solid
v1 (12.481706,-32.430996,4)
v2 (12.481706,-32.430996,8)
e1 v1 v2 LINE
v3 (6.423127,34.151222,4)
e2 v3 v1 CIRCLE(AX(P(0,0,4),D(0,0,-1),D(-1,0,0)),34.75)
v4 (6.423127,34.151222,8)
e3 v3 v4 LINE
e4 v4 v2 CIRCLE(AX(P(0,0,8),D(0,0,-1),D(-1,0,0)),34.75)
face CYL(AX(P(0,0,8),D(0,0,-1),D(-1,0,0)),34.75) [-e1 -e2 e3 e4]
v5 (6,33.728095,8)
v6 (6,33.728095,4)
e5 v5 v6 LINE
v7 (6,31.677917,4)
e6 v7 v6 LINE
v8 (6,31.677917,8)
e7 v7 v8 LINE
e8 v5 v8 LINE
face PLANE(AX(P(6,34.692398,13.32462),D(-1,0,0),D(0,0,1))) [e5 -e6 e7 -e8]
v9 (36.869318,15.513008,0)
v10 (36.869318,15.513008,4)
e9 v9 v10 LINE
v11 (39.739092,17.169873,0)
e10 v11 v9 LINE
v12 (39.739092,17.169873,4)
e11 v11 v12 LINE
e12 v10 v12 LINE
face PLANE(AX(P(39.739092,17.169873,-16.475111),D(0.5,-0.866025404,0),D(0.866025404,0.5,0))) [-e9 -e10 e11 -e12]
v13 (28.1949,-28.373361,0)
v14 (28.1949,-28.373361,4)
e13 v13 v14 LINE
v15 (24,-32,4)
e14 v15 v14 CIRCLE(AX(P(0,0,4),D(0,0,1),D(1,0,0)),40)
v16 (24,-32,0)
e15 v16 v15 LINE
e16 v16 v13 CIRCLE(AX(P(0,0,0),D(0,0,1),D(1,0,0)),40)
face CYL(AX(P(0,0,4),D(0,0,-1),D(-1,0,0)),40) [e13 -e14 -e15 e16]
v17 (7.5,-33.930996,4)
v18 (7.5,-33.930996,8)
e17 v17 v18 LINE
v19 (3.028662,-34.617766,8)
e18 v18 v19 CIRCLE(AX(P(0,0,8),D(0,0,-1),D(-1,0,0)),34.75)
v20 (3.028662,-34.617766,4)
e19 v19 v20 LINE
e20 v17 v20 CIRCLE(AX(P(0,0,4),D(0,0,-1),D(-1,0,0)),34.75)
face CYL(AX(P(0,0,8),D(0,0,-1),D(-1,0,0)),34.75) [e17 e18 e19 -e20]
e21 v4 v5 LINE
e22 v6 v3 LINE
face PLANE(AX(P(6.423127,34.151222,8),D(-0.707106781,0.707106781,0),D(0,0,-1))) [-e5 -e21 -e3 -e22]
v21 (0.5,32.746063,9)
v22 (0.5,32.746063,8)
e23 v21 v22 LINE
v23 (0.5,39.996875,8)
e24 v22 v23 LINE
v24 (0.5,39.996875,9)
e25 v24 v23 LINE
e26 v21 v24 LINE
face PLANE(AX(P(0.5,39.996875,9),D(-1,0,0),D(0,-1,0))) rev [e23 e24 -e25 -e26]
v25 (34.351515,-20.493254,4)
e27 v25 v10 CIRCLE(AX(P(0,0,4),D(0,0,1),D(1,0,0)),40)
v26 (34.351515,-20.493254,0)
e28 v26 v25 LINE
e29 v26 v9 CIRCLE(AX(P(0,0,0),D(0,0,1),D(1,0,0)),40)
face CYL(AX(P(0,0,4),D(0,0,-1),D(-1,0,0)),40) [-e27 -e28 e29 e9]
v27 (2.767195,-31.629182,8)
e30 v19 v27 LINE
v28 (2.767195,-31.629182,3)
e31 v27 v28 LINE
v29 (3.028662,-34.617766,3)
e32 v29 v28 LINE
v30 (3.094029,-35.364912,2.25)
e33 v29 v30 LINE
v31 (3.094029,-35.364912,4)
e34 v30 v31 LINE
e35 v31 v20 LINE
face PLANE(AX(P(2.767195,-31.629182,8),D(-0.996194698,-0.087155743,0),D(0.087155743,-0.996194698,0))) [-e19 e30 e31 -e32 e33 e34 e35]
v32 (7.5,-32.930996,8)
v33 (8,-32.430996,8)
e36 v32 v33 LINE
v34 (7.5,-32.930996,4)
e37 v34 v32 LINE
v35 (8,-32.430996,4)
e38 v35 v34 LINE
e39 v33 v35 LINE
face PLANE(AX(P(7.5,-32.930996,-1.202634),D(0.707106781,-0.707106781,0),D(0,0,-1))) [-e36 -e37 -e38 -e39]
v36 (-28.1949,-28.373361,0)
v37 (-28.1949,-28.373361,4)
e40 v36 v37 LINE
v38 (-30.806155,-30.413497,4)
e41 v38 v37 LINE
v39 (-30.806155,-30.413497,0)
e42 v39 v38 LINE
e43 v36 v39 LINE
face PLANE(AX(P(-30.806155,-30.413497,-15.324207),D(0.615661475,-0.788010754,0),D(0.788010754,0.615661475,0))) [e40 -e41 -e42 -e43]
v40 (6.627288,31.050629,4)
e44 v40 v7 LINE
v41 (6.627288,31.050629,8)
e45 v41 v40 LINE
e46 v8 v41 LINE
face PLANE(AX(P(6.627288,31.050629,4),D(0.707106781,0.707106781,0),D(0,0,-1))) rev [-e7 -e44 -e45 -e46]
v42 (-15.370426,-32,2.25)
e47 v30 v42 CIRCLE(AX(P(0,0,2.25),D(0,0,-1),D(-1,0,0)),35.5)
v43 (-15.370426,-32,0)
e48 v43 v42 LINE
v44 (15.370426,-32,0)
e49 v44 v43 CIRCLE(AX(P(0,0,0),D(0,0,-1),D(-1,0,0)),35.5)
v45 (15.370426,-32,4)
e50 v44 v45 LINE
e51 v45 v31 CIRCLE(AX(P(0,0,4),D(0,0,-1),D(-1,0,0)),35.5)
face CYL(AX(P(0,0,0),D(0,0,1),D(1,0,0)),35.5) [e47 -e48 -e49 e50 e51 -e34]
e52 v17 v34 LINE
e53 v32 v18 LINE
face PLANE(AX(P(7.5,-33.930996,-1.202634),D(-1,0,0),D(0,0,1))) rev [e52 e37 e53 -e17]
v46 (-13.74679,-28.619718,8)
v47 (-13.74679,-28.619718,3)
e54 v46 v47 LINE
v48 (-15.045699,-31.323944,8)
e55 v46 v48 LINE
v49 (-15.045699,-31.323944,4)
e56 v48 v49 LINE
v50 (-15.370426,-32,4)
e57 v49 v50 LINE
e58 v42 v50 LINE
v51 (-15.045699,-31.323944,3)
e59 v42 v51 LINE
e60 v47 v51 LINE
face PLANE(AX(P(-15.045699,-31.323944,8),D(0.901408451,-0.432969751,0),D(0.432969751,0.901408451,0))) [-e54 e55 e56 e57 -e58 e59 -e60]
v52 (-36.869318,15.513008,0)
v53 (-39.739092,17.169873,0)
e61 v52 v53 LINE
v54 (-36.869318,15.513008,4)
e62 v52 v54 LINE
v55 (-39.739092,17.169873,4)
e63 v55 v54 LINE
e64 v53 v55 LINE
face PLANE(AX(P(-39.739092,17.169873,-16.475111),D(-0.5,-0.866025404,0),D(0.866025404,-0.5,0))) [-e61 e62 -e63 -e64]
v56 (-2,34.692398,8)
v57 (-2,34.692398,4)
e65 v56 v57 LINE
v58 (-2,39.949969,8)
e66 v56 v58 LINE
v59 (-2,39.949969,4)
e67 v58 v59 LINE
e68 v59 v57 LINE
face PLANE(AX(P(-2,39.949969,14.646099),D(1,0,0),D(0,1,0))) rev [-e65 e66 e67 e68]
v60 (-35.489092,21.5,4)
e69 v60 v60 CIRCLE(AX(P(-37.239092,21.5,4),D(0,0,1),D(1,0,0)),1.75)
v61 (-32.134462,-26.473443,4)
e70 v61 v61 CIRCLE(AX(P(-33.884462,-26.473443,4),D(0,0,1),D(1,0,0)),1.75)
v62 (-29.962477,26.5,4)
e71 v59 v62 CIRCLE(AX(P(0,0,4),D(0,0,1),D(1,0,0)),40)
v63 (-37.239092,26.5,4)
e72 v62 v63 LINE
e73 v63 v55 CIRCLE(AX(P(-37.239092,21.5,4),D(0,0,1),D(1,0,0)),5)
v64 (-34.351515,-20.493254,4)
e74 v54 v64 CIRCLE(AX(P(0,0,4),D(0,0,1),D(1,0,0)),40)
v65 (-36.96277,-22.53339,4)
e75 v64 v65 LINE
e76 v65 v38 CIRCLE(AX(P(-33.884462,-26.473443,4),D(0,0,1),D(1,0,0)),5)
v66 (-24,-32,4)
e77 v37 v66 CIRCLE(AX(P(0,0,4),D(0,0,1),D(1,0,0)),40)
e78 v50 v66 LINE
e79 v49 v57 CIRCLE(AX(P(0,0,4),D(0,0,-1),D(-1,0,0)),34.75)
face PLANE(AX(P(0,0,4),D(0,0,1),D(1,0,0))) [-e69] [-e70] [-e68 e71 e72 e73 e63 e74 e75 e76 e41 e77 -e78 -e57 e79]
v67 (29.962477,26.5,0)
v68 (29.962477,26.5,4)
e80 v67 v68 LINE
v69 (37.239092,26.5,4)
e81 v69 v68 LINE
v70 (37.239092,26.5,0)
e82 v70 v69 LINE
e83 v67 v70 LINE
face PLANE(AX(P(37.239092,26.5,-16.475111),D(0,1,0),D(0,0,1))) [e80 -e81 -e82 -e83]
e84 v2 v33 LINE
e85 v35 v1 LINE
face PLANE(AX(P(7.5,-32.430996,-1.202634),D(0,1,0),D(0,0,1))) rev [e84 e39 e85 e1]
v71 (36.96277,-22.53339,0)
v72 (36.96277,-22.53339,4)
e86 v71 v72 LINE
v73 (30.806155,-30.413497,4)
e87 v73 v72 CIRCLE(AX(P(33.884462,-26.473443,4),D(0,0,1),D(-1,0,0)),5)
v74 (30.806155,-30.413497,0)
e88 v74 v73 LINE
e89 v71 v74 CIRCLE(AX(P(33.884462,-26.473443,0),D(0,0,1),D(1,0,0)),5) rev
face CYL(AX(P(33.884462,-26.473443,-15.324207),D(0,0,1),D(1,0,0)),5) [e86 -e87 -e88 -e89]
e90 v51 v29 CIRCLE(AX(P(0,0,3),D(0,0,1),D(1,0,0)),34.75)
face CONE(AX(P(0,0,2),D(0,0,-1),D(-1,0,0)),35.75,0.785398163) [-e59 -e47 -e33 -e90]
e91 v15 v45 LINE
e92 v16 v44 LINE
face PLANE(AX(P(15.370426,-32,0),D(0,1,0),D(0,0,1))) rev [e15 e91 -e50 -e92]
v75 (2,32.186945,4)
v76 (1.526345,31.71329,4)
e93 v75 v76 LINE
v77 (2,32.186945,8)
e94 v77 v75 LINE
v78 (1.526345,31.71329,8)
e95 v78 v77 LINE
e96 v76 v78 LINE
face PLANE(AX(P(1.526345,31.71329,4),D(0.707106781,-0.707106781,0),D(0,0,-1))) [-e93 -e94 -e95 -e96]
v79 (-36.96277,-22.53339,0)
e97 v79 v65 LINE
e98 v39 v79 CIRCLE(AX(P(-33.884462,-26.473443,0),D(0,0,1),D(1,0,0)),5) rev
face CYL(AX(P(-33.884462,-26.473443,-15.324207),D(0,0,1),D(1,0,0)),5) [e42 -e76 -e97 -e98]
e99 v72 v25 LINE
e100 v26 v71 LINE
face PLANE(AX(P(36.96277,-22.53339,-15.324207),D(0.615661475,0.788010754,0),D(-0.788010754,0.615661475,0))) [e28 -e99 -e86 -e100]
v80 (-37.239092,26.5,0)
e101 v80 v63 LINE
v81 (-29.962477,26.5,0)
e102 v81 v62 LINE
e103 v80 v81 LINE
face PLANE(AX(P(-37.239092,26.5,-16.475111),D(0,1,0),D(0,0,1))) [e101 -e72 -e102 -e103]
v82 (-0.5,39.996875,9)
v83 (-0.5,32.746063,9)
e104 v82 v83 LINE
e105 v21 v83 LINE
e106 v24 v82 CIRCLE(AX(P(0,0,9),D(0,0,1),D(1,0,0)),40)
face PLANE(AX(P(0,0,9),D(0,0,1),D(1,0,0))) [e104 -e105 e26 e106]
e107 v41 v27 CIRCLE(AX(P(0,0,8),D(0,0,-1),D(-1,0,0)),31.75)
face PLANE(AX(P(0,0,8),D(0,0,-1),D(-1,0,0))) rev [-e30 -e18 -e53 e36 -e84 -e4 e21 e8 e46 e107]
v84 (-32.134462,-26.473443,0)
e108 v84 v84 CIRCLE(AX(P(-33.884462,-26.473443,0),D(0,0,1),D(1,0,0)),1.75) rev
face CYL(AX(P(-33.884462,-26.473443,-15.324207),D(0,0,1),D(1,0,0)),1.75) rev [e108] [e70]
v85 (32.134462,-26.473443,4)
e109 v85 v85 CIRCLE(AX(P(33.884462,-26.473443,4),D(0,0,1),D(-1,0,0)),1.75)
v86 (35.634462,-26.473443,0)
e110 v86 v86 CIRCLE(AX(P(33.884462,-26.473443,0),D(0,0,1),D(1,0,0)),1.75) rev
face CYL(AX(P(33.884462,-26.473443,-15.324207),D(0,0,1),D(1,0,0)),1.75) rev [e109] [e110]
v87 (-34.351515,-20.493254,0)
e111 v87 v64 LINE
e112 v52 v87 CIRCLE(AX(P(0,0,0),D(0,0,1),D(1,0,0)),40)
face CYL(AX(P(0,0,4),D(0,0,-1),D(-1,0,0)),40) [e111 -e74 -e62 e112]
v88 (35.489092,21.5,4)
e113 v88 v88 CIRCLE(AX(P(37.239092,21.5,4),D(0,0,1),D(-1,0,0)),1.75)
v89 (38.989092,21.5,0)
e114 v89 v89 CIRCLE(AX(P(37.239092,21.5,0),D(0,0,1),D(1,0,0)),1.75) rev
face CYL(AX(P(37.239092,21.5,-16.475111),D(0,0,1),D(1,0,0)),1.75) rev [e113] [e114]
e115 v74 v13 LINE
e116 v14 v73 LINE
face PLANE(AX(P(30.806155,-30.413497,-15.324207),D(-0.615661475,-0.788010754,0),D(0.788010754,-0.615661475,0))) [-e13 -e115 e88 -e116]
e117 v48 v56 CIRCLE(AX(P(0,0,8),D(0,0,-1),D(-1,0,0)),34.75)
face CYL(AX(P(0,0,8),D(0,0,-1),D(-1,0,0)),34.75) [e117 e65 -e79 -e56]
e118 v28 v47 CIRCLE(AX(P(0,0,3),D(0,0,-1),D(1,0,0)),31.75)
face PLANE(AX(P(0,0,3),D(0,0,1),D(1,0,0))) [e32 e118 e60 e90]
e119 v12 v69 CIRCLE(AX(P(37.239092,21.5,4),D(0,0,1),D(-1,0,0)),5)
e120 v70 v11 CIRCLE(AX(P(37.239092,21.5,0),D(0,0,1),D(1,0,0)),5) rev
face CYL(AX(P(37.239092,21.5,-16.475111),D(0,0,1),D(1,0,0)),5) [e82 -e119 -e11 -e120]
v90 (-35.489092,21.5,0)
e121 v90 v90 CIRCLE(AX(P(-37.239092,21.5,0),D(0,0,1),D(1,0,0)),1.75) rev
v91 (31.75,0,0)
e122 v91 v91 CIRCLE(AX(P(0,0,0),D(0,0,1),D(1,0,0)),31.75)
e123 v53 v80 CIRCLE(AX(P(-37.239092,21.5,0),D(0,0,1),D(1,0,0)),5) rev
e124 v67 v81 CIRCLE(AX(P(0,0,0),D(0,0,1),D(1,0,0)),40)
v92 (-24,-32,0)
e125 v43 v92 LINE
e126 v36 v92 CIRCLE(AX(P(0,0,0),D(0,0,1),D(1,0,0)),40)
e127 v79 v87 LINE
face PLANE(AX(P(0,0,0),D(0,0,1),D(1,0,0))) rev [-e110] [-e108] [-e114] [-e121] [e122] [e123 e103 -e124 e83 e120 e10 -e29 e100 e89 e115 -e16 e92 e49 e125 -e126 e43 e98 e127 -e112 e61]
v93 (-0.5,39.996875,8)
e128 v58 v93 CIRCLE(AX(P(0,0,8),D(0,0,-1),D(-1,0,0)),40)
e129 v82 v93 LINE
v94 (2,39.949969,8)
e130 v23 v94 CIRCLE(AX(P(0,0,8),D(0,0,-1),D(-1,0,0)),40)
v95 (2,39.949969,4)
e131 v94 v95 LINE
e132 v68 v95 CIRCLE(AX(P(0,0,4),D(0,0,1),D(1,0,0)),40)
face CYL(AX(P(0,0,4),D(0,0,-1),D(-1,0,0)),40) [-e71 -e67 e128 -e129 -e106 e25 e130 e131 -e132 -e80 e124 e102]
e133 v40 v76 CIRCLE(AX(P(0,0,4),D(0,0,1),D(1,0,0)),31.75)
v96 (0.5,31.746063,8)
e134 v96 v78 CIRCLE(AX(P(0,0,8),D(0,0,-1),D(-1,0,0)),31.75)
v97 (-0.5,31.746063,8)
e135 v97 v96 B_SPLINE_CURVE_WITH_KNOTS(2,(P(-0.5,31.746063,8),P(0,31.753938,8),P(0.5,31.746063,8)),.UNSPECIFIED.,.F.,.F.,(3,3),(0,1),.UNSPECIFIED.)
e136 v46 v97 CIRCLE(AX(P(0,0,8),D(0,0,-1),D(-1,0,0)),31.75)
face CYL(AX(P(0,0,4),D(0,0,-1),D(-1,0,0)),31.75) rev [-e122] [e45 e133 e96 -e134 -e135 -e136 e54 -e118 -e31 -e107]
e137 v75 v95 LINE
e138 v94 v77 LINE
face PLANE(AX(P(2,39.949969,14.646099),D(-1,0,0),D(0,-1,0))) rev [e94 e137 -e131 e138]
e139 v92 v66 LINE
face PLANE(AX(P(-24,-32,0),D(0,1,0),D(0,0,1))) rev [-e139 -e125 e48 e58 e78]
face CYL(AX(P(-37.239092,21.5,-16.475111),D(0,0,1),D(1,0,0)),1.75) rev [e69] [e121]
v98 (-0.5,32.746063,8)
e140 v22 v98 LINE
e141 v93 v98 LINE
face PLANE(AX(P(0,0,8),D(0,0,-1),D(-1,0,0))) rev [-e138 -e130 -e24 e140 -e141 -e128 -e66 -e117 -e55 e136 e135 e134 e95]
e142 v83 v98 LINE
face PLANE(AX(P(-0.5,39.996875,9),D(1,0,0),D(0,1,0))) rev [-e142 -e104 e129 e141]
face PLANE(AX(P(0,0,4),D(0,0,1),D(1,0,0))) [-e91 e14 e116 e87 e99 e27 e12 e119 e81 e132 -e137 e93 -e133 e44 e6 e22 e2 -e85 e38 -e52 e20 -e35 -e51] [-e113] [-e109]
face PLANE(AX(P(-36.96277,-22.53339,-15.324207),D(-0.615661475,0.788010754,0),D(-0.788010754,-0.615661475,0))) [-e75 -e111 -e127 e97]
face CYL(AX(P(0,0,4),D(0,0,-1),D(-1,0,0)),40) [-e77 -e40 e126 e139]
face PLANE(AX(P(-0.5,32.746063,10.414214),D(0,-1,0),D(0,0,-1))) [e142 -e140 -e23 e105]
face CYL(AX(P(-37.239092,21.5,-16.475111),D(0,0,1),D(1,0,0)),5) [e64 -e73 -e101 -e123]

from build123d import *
from build123d.topology import SkipClean

# Parameters (mm, degrees)
SKETCH_1_R          = 40
SKETCH_1_R_2        = 31.75
EXTRUDE_1_DEPTH     = 4
EXTRUDE_START       = -4
SKETCH_2_R          = 1.75
EXTRUDE_2_DEPTH     = 4
CUT_EXTRUDE_2_DEPTH = 57.709787515
SKETCH_4_R          = 1.75
EXTRUDE_3_DEPTH     = 4
SKETCH_5_R          = 34.75
SKETCH_5_R_2        = 31.75
EXTRUDE_4_DEPTH     = 4
CUT_EXTRUDE_3_DEPTH = 59.310727346
EXTRUDE_5_DEPTH     = 4
EXTRUDE_6_DEPTH     = 1
CUT_EXTRUDE_START   = -2
CUT_EXTRUDE_4_DEPTH = 2
CUT_EXTRUDE_START_2 = -1
CUT_EXTRUDE_5_DEPTH = 1
CHAMFER_1_SIZE      = 1
SKETCH_11_W         = 4.981706152
SKETCH_11_H         = 1.5
CUT_EXTRUDE_6_DEPTH = 4
CHAMFER_2_SIZE      = 0.5
SKETCH_12_W         = 4
SKETCH_12_H         = 3.514481439
CUT_EXTRUDE_7_DEPTH = 4
CHAMFER_3_SIZE      = 0.5
SKETCH_13_W         = 1
SKETCH_13_H         = 1
CUT_EXTRUDE_8_DEPTH = 1


with BuildPart() as part:
    # 草图1 → 凸台-拉伸1 (new body)
    with BuildSketch(Plane.XY):
        Circle(SKETCH_1_R)
        Circle(SKETCH_1_R_2, mode=Mode.SUBTRACT)
    extrude(amount=EXTRUDE_1_DEPTH)

    # 草图2 → 凸台-拉伸2 (add)
    # profile 1 of 2: a face of its own
    with BuildSketch(Plane.XY.offset(4).offset(EXTRUDE_START)):
        with BuildLine():
            Line((-36.962769782, -22.533389671), (-34.351514644, -20.493253565))
            ThreePointArc((-34.351514644, -20.493253565), (-31.520430144, -24.626459013), (-28.194899891, -28.373361101))
            Line((-28.194899891, -28.373361101), (-30.806155028, -30.413497207))
            ThreePointArc((-30.806155028, -30.413497207), (-37.824516173, -29.551750816), (-36.962769782, -22.533389671))
        make_face()
        with Locations((-33.884462405, -26.473443439)):
            Circle(SKETCH_2_R, mode=Mode.SUBTRACT)
    # profile 2 of 2: a face of its own
    with BuildSketch(Plane.XY.offset(4).offset(EXTRUDE_START)):
        with BuildLine():
            Line((30.806155028, -30.413497207), (28.194899891, -28.373361101))
            ThreePointArc((28.194899891, -28.373361101), (31.520430144, -24.626459013), (34.351514644, -20.493253565))
            Line((34.351514644, -20.493253565), (36.962769782, -22.533389671))
            ThreePointArc((36.962769782, -22.533389671), (37.824516173, -29.551750816), (30.806155028, -30.413497207))
        make_face()
        with Locations((33.884462405, -26.473443439)):
            Circle(SKETCH_2_R, mode=Mode.SUBTRACT)
    extrude(amount=EXTRUDE_2_DEPTH)

    # 草图3 → 切除-拉伸2 (cut, through all)
    with BuildSketch(Plane.XY.offset(4)):
        with BuildLine():
            Line((-24, -32), (-15.370426149, -32))
            ThreePointArc((-15.370426149, -32), (0, -35.5), (15.370426149, -32))
            Line((15.370426149, -32), (24, -32))
            ThreePointArc((24, -32), (0, -40), (-24, -32))
        make_face()
    extrude(amount=-CUT_EXTRUDE_2_DEPTH, mode=Mode.SUBTRACT)

    # 草图4 → 凸台-拉伸3 (add)
    # profile 1 of 2: a face of its own
    with BuildSketch(Plane.XY.offset(4).offset(EXTRUDE_START)):
        with BuildLine():
            Line((-37.239092363, 26.5), (-29.962476533, 26.5))
            ThreePointArc((-29.962476533, 26.5), (-33.86444566, 21.288478578), (-36.869317712, 15.513007814))
            Line((-36.869317712, 15.513007814), (-39.739092363, 17.169872981))
            ThreePointArc((-39.739092363, 17.169872981), (-42.068721494, 22.794095226), (-37.239092363, 26.5))
        make_face()
        with Locations((-37.239092363, 21.5)):
            Circle(SKETCH_4_R, mode=Mode.SUBTRACT)
    # profile 2 of 2: a face of its own
    with BuildSketch(Plane.XY.offset(4).offset(EXTRUDE_START)):
        with BuildLine():
            Line((39.739092363, 17.169872981), (36.869317712, 15.513007814))
            ThreePointArc((36.869317712, 15.513007814), (33.86444566, 21.288478578), (29.962476533, 26.5))
            Line((29.962476533, 26.5), (37.239092363, 26.5))
            ThreePointArc((37.239092363, 26.5), (42.068721494, 22.794095226), (39.739092363, 17.169872981))
        make_face()
        with Locations((37.239092363, 21.5)):
            Circle(SKETCH_4_R, mode=Mode.SUBTRACT)
    extrude(amount=EXTRUDE_3_DEPTH)

    # 草图5 → 凸台-拉伸4 (add)
    with BuildSketch(Plane(origin=(0, 0, 4), x_dir=(-1, 0, 0), z_dir=(0, 0, -1))):
        Circle(SKETCH_5_R)
        Circle(SKETCH_5_R_2, mode=Mode.SUBTRACT)
    extrude(amount=-EXTRUDE_4_DEPTH)

    # 草图6 → 切除-拉伸3 (cut, through all)
    with SkipClean():  # the faces are left unmerged after this step: merging them gives an invalid solid
        with BuildSketch(Plane.XY.offset(4)):
            with BuildLine():
                Line((-15.045698836, -31.323943662), (-13.746789584, -28.61971831))
                ThreePointArc((-13.746789584, -28.61971831), (-5.692283606, -31.235563183), (2.767194832, -31.629181664))
                Line((2.767194832, -31.629181664), (3.02866206, -34.617765759))
                ThreePointArc((3.02866206, -34.617765759), (-6.230137175, -34.18695498), (-15.045698836, -31.323943662))
            make_face()
        extrude(amount=CUT_EXTRUDE_3_DEPTH, mode=Mode.SUBTRACT)

    # 草图7 → 凸台-拉伸5 (add)
    with SkipClean():  # the faces are left unmerged after this step: merging them gives an invalid solid
        with BuildSketch(Plane.XY.offset(4)):
            with BuildLine():
                Line((-2, 39.949968711), (-2, 34.692398303))
                ThreePointArc((-2, 34.692398303), (0, 34.75), (2, 34.692398303))
                Line((2, 34.692398303), (2, 39.949968711))
                ThreePointArc((2, 39.949968711), (0, 40), (-2, 39.949968711))
            make_face()
        extrude(amount=EXTRUDE_5_DEPTH)

    # 草图8 → 凸台-拉伸6 (add)
    with SkipClean():  # the faces are left unmerged after this step: merging them gives an invalid solid
        with BuildSketch(Plane.XY.offset(8)):
            with BuildLine():
                Line((-0.5, 39.996874878), (-0.5, 31.746062748))
                ThreePointArc((-0.5, 31.746062748), (0, 31.75), (0.5, 31.746062748))
                Line((0.5, 31.746062748), (0.5, 39.996874878))
                ThreePointArc((0.5, 39.996874878), (0, 40), (-0.5, 39.996874878))
            make_face()
        extrude(amount=EXTRUDE_6_DEPTH)

    # 草图9 → 切除-拉伸4 (cut)
    with SkipClean():  # the faces are left unmerged after this step: merging them gives an invalid solid
        with BuildSketch(Plane.XY.offset(4).offset(CUT_EXTRUDE_START)):
            with BuildLine():
                Line((-15.045698836, -31.323943662), (-15.370426149, -32))
                ThreePointArc((-15.370426149, -32), (-6.364600567, -34.924802929), (3.094028868, -35.364911782))
                Line((3.094028868, -35.364911782), (3.02866206, -34.617765759))
                ThreePointArc((3.02866206, -34.617765759), (-6.230137175, -34.18695498), (-15.045698836, -31.323943662))
            make_face()
        extrude(amount=CUT_EXTRUDE_4_DEPTH, mode=Mode.SUBTRACT)

    # 草图10 → 切除-拉伸5 (cut)
    with BuildSketch(Plane.XY.offset(4).offset(CUT_EXTRUDE_START_2)):
        with BuildLine():
            Line((3.02866206, -34.617765759), (2.767194832, -31.629181664))
            ThreePointArc((2.767194832, -31.629181664), (-5.692283606, -31.235563183), (-13.746789584, -28.61971831))
            Line((-13.746789584, -28.61971831), (-15.045698836, -31.323943662))
            ThreePointArc((-15.045698836, -31.323943662), (-6.230137175, -34.18695498), (3.02866206, -34.617765759))
        make_face()
    extrude(amount=CUT_EXTRUDE_5_DEPTH, mode=Mode.SUBTRACT)

    # 倒角1
    # the kernel refuses this chamfer: 1 mm, written as the material it adds along each edge
    with BuildSketch(Plane(origin=(0, 0, 2), x_dir=(0.1605769660987581, -0.9870233218918986, 0), z_dir=(0.9870233218918986, 0.1605769660987581, 0))) as chamfer_1_piece_1_section:
        Polygon((34.75 + CHAMFER_1_SIZE, 0), (34.75, -CHAMFER_1_SIZE), (34.75, 0), align=None)
    chamfer_1_piece_1 = revolve(axis=Axis((0, 0, 2), (0, 0, -1)), revolution_arc=39.1369501, mode=Mode.PRIVATE)
    chamfer_1_piece_1 = chamfer_1_piece_1 & Plane(origin=(0, 0, 2), x_dir=(-0.4329697506743493, -0.9014084507042253, 0), z_dir=(0, 0, 1)) * Cylinder(35.5, 143, mode=Mode.PRIVATE)
    add(chamfer_1_piece_1)

    # 草图11 → 切除-拉伸6 (cut)
    with BuildSketch(Plane.XY.offset(8)):
        with Locations((9.990853076, -33.180996154)):
            Rectangle(SKETCH_11_W, SKETCH_11_H)
    extrude(amount=-CUT_EXTRUDE_6_DEPTH, mode=Mode.SUBTRACT)

    # 倒角2
    chamfer_2_edges = [part.edges().sort_by_distance(p)[0] for p in [
        (7.5, -32.430996154, 6),
    ]]
    chamfer(chamfer_2_edges, length=CHAMFER_2_SIZE)

    # 草图12 → 切除-拉伸7 (cut)
    with BuildSketch(Plane.XY.offset(4)):
        with Locations((4, 32.935157584)):
            Rectangle(SKETCH_12_W, SKETCH_12_H)
    extrude(amount=CUT_EXTRUDE_7_DEPTH, mode=Mode.SUBTRACT)

    # 倒角3
    # the kernel refuses this chamfer: 0.630512845, 0.5, 0.471250803, 0.431912073 mm, written as the material it takes off along each edge
    with BuildSketch(Plane(origin=(2, 31.686945261, 9.285841494), x_dir=(0, 1, 0), z_dir=(0, 0, -1))) as chamfer_3_piece_1:
        with BuildLine():
            Line((CHAMFER_3_SIZE, 0), (0.026344876, -0.473655124))
            ThreePointArc((0.026344876, -0.473655124), (0.014426752, -0.243437323), (0, 0))
            Line((0, 0), (CHAMFER_3_SIZE, 0))
        make_face()
    extrude(amount=5.285841494, mode=Mode.SUBTRACT)
    with BuildSketch(Plane(origin=(6, 34.228095185, 9.285841494), x_dir=(0.9838938998328699, -0.17875344436308485, 0), z_dir=(0, 0, -1))) as chamfer_3_piece_2:
        with BuildLine():
            Line((0.430053019, 0), (CHAMFER_3_SIZE * 0.178753444363, CHAMFER_3_SIZE * 0.983893899833))
            Line((CHAMFER_3_SIZE * 0.178753444363, CHAMFER_3_SIZE * 0.983893899833), (0, 0))
            ThreePointArc((0, 0), (0.220718474, -0.000664812), (0.430053019, 0))
        make_face()
    extrude(amount=5.285841494, mode=Mode.SUBTRACT)
    with BuildSketch(Plane(origin=(6, 31.177916864, 4), x_dir=(0, 1, 0), z_dir=(0, 0, 1))) as chamfer_3_piece_3:
        with BuildLine():
            Line((CHAMFER_3_SIZE, 0), (-0.127287982, -0.627287982))
            ThreePointArc((-0.127287982, -0.627287982), (-0.064155933, -0.324269183), (0, 0))
            Line((0, 0), (CHAMFER_3_SIZE, 0))
        make_face()
    extrude(amount=5.653107156, mode=Mode.SUBTRACT)

    # 草图13 → 切除-拉伸8 (cut)
    with BuildSketch(Plane.XY.offset(8)):
        with Locations((0, 32.246062748)):
            Rectangle(SKETCH_13_W, SKETCH_13_H)
    extrude(amount=CUT_EXTRUDE_8_DEPTH, mode=Mode.SUBTRACT)


solid = part.part
